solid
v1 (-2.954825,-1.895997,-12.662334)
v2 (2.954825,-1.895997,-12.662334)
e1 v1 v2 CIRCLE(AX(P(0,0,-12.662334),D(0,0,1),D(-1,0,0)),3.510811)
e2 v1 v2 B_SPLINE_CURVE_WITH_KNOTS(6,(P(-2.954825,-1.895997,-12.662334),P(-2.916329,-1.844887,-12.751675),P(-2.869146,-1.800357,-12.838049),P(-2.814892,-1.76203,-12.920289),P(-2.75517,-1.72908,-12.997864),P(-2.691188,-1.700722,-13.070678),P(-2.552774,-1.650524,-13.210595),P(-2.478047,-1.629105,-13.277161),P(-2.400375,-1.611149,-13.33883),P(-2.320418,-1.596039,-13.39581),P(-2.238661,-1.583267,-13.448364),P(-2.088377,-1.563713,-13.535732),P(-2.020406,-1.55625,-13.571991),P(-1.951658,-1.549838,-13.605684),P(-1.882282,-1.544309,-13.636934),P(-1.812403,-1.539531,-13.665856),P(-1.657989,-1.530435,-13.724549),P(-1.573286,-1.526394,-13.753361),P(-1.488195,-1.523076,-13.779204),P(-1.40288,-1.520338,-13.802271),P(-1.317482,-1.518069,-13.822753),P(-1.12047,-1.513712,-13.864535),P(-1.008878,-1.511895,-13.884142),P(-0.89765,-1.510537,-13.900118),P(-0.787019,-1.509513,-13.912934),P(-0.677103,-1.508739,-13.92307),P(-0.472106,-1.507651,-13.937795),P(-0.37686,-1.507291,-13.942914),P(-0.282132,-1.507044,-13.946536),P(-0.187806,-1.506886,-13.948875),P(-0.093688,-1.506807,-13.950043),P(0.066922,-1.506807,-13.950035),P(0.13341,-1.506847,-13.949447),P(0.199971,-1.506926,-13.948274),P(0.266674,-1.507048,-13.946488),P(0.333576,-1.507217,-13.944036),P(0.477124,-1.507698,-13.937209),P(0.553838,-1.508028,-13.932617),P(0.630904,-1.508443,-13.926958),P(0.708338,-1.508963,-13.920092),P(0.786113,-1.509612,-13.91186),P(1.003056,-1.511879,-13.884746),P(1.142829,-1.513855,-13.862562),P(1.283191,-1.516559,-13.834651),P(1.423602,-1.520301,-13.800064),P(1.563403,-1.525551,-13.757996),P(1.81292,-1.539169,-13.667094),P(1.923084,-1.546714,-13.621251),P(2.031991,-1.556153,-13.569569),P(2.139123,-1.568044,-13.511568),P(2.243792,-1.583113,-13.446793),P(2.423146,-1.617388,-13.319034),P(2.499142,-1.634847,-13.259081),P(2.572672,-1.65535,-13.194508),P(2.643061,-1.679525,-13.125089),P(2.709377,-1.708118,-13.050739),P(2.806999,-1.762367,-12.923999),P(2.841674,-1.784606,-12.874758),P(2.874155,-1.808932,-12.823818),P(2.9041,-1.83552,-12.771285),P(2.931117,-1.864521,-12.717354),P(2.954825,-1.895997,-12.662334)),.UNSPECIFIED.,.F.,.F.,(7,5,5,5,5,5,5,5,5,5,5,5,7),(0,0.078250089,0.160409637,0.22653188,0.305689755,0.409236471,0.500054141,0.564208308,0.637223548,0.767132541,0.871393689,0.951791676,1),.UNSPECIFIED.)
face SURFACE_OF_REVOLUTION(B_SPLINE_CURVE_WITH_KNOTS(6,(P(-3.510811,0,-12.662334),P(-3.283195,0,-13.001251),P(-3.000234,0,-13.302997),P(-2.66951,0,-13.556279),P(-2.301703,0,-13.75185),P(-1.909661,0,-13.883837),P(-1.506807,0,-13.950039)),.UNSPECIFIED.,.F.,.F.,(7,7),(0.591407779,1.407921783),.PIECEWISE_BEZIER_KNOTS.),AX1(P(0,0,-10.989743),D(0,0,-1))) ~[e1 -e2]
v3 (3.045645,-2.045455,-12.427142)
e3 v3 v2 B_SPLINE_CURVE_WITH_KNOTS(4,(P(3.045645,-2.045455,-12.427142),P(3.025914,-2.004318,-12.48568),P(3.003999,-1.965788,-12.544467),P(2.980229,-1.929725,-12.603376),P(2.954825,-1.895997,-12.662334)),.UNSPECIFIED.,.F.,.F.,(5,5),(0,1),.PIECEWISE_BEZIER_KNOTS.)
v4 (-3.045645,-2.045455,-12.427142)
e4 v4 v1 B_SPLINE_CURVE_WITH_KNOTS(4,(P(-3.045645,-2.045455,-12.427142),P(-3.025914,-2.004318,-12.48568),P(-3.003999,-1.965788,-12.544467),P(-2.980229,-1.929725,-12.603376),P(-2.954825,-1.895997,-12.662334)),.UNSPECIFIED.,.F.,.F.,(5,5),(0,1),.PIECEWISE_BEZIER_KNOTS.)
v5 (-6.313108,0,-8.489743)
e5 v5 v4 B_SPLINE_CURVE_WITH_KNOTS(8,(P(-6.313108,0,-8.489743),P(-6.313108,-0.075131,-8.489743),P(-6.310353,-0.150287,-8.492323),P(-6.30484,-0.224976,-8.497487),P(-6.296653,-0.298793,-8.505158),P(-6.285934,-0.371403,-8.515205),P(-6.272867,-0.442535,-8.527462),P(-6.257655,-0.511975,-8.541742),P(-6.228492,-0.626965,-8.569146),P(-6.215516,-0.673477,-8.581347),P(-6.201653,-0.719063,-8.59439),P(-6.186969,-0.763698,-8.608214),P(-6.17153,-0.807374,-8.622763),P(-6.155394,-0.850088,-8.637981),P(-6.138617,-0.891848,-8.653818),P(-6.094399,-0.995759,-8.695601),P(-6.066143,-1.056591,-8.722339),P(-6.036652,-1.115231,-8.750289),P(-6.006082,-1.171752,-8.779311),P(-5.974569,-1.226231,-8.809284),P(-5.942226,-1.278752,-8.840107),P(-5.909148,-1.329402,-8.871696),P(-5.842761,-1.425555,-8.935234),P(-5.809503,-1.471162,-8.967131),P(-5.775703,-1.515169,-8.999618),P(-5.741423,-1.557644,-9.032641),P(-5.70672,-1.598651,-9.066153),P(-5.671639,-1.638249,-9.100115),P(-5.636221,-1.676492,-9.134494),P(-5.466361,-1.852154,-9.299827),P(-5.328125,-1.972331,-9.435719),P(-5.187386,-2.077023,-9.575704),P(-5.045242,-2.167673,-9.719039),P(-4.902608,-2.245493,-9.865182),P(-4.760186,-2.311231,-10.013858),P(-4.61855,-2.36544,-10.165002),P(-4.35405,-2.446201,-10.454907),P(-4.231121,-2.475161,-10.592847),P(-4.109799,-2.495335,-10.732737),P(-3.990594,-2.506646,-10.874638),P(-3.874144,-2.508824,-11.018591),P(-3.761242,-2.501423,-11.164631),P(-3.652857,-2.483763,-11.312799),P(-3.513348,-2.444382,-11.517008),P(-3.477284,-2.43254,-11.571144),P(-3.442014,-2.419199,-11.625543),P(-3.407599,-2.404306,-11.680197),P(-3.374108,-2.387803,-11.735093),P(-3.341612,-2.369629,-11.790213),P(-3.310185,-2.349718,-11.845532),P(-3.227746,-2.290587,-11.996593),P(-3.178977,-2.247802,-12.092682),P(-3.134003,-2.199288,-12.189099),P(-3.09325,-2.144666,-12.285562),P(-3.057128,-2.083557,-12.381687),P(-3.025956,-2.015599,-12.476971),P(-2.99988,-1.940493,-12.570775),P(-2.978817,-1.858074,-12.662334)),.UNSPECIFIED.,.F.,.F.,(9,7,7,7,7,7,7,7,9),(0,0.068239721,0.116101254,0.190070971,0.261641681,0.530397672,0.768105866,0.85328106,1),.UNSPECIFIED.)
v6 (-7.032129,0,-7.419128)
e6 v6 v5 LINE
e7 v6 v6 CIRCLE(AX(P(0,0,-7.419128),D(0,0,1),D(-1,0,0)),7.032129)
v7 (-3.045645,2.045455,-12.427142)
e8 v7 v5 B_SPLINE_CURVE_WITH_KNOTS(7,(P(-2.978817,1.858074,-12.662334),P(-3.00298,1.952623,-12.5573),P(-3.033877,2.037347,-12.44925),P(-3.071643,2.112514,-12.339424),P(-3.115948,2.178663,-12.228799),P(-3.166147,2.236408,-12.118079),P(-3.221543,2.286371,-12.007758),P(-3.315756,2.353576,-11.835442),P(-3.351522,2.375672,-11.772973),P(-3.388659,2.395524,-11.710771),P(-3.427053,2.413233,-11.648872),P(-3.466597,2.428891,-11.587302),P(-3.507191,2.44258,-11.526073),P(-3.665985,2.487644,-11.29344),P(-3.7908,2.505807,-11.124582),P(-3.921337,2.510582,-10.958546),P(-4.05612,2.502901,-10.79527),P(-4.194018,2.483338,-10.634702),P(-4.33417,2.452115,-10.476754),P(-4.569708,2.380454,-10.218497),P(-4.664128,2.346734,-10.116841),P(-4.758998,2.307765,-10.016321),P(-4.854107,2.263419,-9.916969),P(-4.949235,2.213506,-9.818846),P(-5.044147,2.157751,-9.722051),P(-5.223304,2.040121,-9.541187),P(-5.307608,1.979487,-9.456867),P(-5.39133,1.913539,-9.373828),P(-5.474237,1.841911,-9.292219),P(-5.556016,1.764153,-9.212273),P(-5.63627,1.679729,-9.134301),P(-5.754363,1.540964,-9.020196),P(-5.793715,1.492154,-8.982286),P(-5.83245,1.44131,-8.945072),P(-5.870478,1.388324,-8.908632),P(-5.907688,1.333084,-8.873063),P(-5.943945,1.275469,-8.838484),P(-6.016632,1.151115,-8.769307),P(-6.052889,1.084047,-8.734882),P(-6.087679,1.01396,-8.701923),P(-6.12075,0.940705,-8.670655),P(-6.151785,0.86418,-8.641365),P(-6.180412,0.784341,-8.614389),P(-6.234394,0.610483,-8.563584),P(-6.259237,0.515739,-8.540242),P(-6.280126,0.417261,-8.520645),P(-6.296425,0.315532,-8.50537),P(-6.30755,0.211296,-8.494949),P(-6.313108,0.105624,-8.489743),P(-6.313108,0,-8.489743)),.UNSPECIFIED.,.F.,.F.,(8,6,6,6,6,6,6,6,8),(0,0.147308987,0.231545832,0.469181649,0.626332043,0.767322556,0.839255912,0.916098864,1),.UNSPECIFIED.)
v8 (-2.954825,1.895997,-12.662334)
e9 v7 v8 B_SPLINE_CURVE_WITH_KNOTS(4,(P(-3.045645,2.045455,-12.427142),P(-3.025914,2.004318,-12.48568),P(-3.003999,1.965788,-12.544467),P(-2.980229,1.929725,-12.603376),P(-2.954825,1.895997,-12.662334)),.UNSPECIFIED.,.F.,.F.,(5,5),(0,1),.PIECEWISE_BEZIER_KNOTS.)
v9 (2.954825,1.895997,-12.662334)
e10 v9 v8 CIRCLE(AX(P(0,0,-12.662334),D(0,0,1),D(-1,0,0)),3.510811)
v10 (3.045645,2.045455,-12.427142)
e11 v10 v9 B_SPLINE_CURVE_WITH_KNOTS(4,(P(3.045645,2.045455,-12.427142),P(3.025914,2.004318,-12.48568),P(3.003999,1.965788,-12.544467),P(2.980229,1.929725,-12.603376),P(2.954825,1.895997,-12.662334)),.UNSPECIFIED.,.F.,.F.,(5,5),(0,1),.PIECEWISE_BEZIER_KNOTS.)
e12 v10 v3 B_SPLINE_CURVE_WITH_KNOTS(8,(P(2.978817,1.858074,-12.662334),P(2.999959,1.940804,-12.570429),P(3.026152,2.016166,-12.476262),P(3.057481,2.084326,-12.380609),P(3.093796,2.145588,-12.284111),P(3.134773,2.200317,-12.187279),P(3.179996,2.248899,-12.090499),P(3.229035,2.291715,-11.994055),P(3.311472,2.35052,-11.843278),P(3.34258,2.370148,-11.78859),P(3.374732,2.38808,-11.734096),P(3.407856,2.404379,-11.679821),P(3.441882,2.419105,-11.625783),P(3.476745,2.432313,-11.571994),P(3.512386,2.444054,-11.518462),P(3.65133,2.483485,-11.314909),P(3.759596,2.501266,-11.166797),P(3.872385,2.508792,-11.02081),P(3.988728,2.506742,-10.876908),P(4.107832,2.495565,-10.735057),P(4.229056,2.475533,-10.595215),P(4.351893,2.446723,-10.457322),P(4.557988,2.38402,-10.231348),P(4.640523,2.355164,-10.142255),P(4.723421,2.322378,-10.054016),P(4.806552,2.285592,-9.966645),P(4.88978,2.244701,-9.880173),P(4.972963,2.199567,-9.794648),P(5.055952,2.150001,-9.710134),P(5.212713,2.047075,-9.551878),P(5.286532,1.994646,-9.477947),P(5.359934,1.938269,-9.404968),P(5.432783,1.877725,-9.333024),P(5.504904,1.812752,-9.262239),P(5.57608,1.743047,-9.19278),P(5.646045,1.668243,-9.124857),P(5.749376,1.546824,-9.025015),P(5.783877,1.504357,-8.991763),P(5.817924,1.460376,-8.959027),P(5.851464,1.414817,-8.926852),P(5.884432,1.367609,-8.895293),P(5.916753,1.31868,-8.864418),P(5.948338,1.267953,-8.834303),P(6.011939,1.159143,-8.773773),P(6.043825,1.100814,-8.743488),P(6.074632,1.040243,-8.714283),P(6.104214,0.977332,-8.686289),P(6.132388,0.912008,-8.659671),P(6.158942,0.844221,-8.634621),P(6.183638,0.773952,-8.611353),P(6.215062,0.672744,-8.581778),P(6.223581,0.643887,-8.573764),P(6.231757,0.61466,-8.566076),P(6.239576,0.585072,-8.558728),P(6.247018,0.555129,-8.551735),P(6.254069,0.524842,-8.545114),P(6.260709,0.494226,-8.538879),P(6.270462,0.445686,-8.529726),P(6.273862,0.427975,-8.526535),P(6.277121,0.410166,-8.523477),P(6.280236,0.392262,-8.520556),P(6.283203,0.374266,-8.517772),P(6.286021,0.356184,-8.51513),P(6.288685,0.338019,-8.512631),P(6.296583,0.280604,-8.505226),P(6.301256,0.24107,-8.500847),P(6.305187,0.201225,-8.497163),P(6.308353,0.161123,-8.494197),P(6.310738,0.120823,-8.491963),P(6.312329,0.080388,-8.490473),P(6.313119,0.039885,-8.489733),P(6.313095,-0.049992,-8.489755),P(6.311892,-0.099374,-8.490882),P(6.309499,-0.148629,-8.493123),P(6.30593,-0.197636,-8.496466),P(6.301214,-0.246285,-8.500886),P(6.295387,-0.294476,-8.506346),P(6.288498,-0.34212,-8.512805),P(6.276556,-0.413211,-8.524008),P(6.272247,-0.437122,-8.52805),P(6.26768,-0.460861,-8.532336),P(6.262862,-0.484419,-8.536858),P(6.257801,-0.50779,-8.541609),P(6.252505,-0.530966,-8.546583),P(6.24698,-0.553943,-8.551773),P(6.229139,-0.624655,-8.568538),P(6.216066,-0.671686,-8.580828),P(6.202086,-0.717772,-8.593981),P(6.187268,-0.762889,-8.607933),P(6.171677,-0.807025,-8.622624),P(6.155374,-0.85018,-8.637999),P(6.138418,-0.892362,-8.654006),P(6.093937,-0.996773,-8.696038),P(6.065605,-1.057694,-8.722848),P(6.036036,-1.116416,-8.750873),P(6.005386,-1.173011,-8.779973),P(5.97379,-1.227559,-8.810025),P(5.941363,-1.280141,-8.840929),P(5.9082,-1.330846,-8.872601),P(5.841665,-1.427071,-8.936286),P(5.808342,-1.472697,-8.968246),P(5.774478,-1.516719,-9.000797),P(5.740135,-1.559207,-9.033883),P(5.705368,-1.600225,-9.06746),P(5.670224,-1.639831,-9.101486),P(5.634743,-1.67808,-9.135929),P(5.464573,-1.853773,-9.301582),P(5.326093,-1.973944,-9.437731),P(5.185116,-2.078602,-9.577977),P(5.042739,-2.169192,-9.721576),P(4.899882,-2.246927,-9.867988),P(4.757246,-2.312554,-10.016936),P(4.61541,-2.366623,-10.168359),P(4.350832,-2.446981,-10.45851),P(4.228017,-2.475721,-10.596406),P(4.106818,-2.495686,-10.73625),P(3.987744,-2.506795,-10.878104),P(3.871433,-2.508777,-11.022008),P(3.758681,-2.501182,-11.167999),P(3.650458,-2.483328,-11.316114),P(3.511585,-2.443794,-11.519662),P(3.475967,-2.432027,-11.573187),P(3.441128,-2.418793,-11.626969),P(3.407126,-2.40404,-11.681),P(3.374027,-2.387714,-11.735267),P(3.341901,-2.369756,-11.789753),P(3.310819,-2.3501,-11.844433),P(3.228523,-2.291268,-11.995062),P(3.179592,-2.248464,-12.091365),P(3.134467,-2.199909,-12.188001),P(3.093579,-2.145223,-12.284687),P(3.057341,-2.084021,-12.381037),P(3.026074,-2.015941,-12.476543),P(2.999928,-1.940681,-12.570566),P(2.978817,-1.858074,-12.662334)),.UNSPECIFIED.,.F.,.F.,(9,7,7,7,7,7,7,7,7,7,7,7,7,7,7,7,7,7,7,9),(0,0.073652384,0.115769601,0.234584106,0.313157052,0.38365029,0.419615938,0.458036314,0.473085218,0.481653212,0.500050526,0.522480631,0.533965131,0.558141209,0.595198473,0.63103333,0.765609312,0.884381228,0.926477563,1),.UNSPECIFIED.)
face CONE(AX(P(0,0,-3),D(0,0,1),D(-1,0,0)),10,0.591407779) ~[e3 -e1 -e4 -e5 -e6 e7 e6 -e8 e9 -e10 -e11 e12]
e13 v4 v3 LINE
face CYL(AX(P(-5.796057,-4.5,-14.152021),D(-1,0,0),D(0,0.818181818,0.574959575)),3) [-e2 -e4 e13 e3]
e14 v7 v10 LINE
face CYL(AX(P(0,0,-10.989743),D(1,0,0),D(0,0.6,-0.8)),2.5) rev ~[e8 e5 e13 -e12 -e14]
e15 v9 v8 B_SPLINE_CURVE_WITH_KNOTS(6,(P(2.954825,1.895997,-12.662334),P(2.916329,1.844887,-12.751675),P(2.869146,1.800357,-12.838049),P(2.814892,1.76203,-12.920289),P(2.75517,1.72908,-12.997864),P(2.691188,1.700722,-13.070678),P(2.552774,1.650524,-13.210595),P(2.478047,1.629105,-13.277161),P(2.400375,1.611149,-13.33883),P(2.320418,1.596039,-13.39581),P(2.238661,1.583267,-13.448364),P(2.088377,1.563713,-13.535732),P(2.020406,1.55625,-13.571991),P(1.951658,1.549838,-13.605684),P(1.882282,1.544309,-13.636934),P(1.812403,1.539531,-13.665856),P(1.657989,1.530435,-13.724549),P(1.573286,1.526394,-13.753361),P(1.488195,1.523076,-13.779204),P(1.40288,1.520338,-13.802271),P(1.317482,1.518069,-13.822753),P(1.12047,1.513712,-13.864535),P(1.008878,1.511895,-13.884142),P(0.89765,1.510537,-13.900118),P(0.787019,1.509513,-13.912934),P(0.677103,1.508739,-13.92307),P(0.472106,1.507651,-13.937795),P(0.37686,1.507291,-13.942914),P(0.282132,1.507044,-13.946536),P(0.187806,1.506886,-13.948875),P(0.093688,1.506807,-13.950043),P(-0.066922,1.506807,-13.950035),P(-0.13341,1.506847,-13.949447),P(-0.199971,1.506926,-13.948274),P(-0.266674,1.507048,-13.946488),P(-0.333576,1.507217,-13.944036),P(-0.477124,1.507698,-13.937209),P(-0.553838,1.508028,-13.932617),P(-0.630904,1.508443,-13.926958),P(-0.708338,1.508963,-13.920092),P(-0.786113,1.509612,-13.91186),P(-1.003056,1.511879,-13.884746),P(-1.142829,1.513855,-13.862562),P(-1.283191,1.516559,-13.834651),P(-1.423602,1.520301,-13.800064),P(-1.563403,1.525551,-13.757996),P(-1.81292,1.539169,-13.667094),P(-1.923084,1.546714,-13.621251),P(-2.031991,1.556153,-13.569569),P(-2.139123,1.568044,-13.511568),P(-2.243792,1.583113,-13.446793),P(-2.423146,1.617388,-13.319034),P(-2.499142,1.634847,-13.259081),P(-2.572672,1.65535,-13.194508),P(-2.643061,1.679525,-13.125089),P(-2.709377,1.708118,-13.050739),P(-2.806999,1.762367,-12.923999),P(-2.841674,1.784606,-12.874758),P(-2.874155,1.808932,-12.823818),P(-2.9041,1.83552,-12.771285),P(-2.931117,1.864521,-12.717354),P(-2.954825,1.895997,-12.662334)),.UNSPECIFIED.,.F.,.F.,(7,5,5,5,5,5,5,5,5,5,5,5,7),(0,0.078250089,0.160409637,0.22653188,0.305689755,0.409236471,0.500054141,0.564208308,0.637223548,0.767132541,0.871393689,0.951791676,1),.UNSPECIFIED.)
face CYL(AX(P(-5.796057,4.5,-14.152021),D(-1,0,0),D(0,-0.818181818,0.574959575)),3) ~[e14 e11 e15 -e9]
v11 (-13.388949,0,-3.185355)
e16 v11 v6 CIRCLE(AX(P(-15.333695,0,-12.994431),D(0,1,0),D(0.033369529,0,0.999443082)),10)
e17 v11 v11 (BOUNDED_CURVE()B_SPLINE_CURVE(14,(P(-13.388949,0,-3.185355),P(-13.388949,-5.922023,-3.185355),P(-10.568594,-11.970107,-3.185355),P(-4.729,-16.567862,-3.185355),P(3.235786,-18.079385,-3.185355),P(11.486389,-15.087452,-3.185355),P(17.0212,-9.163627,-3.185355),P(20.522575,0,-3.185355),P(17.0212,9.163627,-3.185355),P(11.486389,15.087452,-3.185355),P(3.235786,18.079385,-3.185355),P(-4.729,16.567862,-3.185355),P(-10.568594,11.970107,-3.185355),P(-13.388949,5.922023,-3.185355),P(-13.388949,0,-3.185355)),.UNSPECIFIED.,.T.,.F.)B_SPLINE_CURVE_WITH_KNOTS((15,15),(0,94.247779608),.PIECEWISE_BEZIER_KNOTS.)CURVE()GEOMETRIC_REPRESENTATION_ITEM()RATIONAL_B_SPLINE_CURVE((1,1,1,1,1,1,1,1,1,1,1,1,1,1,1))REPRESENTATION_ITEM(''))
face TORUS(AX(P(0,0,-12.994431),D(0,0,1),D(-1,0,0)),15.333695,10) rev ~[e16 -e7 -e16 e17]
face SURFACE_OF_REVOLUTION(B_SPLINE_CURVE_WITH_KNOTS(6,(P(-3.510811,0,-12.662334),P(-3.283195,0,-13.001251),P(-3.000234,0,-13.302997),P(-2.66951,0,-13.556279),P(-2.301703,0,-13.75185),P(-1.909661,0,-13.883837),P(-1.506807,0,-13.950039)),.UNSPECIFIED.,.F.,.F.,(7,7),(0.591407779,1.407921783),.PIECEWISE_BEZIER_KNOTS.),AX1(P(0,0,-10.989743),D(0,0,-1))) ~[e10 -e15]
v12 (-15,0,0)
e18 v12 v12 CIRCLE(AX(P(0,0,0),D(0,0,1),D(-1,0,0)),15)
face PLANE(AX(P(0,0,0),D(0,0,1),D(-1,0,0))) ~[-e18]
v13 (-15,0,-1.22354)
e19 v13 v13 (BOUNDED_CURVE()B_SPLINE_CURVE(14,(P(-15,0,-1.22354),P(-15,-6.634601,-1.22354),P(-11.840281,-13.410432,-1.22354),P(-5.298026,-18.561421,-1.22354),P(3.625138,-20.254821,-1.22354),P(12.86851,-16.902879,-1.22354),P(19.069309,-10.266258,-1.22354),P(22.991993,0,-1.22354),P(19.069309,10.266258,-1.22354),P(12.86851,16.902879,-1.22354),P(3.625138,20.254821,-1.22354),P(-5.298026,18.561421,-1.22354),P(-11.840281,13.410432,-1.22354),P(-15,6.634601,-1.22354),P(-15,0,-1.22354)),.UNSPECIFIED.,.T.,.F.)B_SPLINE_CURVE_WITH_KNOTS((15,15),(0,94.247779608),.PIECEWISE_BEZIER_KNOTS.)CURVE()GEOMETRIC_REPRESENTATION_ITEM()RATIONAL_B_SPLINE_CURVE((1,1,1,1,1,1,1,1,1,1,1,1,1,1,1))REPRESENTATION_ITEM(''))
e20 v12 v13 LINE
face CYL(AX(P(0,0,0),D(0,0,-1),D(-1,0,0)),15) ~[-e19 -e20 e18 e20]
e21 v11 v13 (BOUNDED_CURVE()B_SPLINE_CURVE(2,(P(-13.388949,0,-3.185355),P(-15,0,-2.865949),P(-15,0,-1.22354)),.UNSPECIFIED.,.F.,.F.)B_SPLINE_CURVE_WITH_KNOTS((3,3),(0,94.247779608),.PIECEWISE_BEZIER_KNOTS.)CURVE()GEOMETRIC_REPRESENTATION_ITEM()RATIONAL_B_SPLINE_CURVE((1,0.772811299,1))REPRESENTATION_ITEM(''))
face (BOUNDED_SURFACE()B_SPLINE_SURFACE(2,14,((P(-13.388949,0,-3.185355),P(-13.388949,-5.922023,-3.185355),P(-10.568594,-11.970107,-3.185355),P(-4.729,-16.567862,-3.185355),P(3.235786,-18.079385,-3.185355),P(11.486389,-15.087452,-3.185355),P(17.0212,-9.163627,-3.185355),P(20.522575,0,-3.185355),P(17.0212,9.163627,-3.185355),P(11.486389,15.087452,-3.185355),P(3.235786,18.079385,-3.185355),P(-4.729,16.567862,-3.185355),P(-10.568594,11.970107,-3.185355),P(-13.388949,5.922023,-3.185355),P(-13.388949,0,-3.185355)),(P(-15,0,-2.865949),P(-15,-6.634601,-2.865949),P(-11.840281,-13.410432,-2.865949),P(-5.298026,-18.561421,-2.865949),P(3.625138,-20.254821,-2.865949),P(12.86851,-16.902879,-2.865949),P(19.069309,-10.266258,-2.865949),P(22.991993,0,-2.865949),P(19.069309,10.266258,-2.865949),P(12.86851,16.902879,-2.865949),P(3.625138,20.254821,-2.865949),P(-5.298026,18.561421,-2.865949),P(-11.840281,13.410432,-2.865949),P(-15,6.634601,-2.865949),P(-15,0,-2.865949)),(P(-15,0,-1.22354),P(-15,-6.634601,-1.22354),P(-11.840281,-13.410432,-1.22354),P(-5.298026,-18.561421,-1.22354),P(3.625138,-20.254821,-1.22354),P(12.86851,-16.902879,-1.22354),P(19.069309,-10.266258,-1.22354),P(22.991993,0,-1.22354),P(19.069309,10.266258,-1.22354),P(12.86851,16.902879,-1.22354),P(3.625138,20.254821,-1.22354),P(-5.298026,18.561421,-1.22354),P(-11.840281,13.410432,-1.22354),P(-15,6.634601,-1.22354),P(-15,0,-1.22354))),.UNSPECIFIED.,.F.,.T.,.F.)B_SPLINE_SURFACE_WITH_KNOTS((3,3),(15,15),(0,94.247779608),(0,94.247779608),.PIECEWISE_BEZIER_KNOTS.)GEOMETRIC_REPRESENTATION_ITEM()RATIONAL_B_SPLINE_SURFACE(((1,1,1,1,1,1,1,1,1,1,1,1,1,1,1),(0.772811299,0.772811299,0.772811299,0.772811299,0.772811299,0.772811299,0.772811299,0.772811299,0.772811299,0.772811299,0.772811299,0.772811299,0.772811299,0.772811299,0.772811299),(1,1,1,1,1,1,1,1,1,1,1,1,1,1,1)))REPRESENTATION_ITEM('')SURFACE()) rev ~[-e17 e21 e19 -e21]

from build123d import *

# Parameters (mm, degrees)
F3_R          = 2
F4_R          = 3
F6_DEPTH      = 15.0010001
F6_DEPTH_BACK = 15.0010001
F7_T1_DEPTH   = 11.5921148274


# Not quite as in the source:
# - a fillet or chamfer that OpenCascade refuses, or shapes differently, is made with other operations: its cross-section is extruded or revolved along the edge and cut away or added
# - a feature of the source that left no trace in its solid (it failed there, or was rolled back) is left out


with BuildPart() as f1:
    # F0 (on Front) → F1 (revolve)
    with BuildSketch(Plane.XZ):
        Polygon((0, -13.9897428453), (0, 0), (-15, 0), (-15, -3), (-10, -3), (-2.61932757, -13.9897428453), align=None)
    revolve(axis=Axis((0, 0, -6.9948714226), (0, 0, 1)))

    # F2: fillet of radius 10 on 1 edges, made by hand

    # F2_s1 → F2_t2 (revolve)
    with BuildSketch(Plane.XZ):
        with BuildLine():
            ThreePointArc((-15, -3), (-10.4835294041, -4.2493813133), (-7.0321290602, -7.4191283024))
            Line((-7.0321290602, -7.4191283024), (-10, -3))
            Line((-10, -3), (-15, -3))
        make_face()
    revolve(axis=Axis((0, 0, -3), (0, 0, 1)))

    # F3
    f3_edges = [f1.edges().sort_by_distance(p)[0] for p in [
        (15, 0, -3),
    ]]
    fillet(f3_edges, radius=F3_R)

    # F4
    f4_edges = [f1.edges().sort_by_distance(p)[0] for p in [
        (2.619328, 0, -13.989743),
    ]]
    fillet(f4_edges, radius=F4_R)

    # F5 (on Right) → F6 (cut, two sides)
    with BuildSketch(Plane.YZ) as f6_sk:
        with BuildLine():
            Line((1.5, -14.6206104997), (1.5, -12.9897428453))
            ThreePointArc((1.5, -12.9897428453), (0, -8.4897428453), (-1.5, -12.9897428453))
            Line((-1.5, -12.9897428453), (-1.5, -14.6206104997))
            Line((-1.5, -14.6206104997), (1.5, -14.6206104997))
        make_face()
    extrude(amount=-F6_DEPTH, mode=Mode.SUBTRACT)
    extrude(f6_sk.sketch, amount=F6_DEPTH_BACK, mode=Mode.SUBTRACT)

    # F7: fillet of radius 3 on 2 edges, made by hand

    # F7_s2 → F7_t1 (cut)
    with BuildSketch(Plane.YZ.offset(-5.7960574137)):
        with BuildLine():
            ThreePointArc((-2.0454545455, -12.4271417817), (-1.6396122323, -13.2474864717), (-1.5, -14.1520205055))
            Line((-1.5, -14.1520205055), (-1.5, -12.9897428453))
            ThreePointArc((-1.5, -12.9897428453), (-1.7949072323, -12.7299462895), (-2.0454545455, -12.4271417817))
        make_face()
        with BuildLine():
            ThreePointArc((2.0454545455, -12.4271417817), (1.6396122323, -13.2474864717), (1.5, -14.1520205055))
            Line((1.5, -14.1520205055), (1.5, -12.9897428453))
            ThreePointArc((1.5, -12.9897428453), (1.7949072323, -12.7299462895), (2.0454545455, -12.4271417817))
        make_face()
    extrude(amount=F7_T1_DEPTH, mode=Mode.SUBTRACT)


solid = f1.part
